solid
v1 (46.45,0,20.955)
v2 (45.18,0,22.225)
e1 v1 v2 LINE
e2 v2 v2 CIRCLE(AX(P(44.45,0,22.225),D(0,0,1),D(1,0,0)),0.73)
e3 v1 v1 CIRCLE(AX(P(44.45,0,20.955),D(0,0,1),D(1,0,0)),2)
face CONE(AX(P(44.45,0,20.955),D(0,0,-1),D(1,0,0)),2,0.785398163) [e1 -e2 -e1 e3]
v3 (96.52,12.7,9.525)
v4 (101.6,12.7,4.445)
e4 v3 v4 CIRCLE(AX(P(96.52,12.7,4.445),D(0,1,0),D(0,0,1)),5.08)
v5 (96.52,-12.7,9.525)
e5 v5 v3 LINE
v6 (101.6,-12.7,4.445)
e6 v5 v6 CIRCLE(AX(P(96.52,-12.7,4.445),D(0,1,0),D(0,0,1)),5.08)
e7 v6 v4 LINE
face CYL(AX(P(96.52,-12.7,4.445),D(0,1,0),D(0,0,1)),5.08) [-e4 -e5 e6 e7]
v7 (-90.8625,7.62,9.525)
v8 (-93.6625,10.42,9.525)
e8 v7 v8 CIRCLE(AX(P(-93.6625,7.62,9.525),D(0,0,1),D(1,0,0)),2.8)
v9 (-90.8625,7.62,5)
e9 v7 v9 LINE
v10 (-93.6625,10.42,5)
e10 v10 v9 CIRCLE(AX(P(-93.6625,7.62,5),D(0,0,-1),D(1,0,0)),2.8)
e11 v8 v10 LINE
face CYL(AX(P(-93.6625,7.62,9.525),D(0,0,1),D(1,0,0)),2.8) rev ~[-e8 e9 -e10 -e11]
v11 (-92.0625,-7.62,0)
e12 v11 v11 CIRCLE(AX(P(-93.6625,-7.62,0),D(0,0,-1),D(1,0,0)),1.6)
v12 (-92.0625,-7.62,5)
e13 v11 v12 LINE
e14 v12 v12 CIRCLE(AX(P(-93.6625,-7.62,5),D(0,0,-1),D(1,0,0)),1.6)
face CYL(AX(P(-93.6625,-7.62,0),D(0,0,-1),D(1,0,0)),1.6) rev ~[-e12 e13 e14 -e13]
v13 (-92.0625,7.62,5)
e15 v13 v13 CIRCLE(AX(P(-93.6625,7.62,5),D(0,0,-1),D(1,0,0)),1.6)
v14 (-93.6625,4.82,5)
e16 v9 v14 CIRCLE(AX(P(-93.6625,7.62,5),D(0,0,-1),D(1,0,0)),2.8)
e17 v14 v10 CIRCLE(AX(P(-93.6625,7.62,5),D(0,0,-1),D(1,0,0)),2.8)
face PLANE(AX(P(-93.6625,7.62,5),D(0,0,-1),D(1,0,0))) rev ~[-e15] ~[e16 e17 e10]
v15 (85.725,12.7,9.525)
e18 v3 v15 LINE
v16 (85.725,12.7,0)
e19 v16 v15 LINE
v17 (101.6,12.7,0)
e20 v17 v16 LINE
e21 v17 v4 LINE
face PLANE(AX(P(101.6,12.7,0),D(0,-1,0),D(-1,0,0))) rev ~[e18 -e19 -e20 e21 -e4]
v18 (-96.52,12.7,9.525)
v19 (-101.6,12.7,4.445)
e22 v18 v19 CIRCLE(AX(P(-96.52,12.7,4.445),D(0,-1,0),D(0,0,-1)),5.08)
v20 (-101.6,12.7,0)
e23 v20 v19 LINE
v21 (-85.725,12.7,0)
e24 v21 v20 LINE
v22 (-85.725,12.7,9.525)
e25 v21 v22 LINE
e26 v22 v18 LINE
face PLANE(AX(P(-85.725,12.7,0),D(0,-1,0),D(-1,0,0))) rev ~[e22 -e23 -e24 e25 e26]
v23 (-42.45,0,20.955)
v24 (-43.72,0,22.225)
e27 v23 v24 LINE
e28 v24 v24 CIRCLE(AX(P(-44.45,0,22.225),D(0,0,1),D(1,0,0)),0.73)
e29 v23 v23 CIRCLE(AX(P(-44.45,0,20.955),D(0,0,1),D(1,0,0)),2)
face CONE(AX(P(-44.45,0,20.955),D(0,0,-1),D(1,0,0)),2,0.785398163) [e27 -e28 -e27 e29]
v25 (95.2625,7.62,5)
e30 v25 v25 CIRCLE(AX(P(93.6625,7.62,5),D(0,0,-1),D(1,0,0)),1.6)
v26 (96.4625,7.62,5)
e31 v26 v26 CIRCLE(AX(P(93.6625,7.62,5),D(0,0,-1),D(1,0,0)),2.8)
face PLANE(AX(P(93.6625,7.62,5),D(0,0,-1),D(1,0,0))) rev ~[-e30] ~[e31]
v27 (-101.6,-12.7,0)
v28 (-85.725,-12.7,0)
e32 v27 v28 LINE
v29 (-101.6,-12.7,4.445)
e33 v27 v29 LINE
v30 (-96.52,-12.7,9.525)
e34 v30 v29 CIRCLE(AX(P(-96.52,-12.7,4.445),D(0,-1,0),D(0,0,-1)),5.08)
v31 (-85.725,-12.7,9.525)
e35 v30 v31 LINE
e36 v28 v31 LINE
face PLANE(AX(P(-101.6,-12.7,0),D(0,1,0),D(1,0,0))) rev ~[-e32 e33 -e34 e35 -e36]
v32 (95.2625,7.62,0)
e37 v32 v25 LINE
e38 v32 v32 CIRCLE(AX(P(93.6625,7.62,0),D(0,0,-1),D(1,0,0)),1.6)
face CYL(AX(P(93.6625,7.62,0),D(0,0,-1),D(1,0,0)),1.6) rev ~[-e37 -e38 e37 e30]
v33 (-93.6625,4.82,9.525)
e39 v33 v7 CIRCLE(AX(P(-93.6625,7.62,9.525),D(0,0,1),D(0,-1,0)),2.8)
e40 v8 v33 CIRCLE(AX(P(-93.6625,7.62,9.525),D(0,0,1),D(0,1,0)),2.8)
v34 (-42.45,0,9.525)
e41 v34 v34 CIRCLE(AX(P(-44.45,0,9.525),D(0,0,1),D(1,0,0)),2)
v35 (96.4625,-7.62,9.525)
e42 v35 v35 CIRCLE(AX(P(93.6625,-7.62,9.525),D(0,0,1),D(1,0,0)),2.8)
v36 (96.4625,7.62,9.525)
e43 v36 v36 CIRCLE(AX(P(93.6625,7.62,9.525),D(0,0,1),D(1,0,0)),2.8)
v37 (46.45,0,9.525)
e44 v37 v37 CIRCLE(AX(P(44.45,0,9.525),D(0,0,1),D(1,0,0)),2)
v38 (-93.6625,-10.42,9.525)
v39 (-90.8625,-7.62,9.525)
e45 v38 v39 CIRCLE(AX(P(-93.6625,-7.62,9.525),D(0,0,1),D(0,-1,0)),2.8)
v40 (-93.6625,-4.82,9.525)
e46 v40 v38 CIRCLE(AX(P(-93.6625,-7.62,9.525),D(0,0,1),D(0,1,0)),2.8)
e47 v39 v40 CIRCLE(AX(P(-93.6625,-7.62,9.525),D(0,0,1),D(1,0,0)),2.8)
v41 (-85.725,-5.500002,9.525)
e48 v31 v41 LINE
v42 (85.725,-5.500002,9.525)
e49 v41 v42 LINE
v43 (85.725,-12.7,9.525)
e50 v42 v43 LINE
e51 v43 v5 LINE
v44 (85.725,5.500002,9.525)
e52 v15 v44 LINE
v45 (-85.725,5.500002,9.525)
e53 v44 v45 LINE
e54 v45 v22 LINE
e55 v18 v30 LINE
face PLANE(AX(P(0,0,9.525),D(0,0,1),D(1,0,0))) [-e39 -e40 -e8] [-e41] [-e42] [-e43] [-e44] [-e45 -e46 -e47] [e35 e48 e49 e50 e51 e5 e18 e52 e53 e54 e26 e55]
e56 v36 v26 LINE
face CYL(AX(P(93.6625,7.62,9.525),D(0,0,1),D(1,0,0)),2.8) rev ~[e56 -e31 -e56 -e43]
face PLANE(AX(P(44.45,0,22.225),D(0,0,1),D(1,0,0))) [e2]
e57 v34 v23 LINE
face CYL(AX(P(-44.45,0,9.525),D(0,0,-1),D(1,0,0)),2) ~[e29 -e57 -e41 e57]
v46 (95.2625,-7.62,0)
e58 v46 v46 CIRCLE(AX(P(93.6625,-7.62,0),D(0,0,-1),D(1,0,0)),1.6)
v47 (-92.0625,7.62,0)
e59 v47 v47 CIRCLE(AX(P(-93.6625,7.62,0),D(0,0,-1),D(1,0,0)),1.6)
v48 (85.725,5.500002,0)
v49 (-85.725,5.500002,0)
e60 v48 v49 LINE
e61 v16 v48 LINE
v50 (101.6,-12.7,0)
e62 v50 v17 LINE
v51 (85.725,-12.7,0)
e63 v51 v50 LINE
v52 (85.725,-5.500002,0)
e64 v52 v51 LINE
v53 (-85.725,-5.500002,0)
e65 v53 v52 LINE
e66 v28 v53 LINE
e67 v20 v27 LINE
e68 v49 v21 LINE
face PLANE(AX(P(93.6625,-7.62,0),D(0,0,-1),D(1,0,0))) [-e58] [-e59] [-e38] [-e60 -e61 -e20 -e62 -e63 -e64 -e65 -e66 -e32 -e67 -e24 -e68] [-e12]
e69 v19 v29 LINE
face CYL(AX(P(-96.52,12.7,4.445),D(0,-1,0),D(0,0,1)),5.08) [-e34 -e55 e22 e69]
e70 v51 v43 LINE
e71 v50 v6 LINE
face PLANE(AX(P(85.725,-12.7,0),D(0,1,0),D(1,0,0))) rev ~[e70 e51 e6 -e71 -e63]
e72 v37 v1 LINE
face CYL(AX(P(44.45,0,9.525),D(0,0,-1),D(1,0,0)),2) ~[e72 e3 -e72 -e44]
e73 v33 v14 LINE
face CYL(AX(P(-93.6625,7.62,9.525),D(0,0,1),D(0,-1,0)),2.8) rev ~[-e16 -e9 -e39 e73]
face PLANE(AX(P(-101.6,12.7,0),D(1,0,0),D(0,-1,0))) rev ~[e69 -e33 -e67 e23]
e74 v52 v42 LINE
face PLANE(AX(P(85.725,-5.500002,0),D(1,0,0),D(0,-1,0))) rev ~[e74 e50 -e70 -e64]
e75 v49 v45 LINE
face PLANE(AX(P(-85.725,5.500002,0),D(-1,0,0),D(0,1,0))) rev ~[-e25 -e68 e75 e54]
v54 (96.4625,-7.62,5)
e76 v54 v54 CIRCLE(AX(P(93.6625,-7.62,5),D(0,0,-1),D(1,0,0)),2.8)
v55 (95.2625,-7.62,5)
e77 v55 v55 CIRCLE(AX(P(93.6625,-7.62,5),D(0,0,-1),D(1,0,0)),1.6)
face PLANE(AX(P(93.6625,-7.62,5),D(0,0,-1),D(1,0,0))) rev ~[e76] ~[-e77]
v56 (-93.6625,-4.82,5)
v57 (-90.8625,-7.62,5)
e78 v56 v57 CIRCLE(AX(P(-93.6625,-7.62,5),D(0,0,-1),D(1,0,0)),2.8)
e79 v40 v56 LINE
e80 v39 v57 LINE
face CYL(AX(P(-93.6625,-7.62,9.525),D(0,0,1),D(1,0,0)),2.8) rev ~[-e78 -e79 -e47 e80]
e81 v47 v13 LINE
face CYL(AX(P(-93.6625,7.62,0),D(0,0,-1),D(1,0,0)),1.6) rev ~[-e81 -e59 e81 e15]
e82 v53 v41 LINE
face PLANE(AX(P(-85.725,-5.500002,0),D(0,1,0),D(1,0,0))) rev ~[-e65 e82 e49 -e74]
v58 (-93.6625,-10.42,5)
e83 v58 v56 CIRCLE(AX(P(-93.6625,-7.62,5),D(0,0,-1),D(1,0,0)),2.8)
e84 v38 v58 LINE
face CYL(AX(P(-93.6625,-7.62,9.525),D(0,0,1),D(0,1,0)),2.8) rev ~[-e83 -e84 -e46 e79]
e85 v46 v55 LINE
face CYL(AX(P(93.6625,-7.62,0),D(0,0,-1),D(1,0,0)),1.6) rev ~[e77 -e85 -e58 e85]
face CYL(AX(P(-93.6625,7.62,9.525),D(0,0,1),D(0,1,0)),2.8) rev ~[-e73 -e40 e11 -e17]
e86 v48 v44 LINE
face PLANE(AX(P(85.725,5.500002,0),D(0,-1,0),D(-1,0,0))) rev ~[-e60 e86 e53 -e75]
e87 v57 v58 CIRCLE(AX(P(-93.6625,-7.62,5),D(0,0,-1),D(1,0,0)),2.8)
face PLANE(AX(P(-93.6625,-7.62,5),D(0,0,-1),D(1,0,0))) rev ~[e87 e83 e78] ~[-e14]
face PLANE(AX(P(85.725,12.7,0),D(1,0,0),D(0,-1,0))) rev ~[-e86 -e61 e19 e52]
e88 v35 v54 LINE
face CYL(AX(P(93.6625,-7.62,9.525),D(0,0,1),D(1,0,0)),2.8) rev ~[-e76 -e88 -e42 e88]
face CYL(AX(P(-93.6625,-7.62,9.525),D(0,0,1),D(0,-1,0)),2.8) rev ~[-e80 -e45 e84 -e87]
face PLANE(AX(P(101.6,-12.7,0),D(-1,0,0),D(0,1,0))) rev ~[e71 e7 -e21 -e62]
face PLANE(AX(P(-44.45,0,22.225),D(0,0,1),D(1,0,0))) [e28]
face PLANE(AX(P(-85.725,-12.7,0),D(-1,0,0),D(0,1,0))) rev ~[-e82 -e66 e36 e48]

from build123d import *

# Parameters (mm, degrees)
F1_DEPTH = 9.525
F2_R     = 2.8
F3_DEPTH = 9.525
F4_R     = 2
F5_DEPTH = 12.7
F6_SIZE  = 1.27
F7_R     = 5.08
F8_R     = 2.8
F8_R_2   = 1.6
F9_DEPTH = 5


# Not quite as in the source:
# - a length typed as a fraction of an inch, garbled in the dataset ("3 / 203.2 mm" for 3/8 in), is restored


with BuildPart() as f1:
    # F0 (on Top) → F1 (new body)
    with BuildSketch(Plane.XY):
        Polygon((-85.725, -5.5000017), (85.725, -5.5000017), (85.725, -12.7), (101.6, -12.7), (101.6, -5.5000017), (101.6, 5.5000017), (101.6, 12.7), (85.725, 12.7), (85.725, 5.5000017), (-85.725, 5.5000017), (-85.725, 12.7), (-101.6, 12.7), (-101.6, 5.5000017), (-101.6, -5.5000017), (-101.6, -12.7), (-85.725, -12.7), align=None)
    extrude(amount=F1_DEPTH)

    # F2 (on face) → F3 (cut, through all)
    with BuildSketch(Plane.XY.offset(9.525)):
        with BuildLine():
            ThreePointArc((-93.6625, 4.82), (-91.6826010127, 5.6401010127), (-90.8625, 7.62))
            ThreePointArc((-90.8625, 7.62), (-91.6826010127, 9.5998989873), (-93.6625, 10.42))
            Line((-93.6625, 10.42), (-93.6625, 4.82))
        make_face()
        with BuildLine():
            ThreePointArc((-90.8625, -7.62), (-91.6826010127, -5.6401010127), (-93.6625, -4.82))
            Line((-93.6625, -4.82), (-93.6625, -10.42))
            ThreePointArc((-93.6625, -10.42), (-91.6826010127, -9.5998989873), (-90.8625, -7.62))
        make_face()
        with BuildLine():
            Line((-93.6625, -10.42), (-93.6625, -4.82))
            ThreePointArc((-93.6625, -4.82), (-96.4625, -7.62), (-93.6625, -10.42))
        make_face()
        with BuildLine():
            Line((-93.6625, 4.82), (-93.6625, 10.42))
            ThreePointArc((-93.6625, 10.42), (-96.4625, 7.62), (-93.6625, 4.82))
        make_face()
        with Locations((93.6625, 7.62)):
            Circle(F2_R)
        with Locations((93.6625, -7.62)):
            Circle(F2_R)
    extrude(amount=-F3_DEPTH, mode=Mode.SUBTRACT)

    # F4 (on face) → F5 (join)
    with BuildSketch(Plane.XY.offset(9.525)):
        with Locations((-44.45, 0)):
            Circle(F4_R)
        with Locations((44.45, 0)):
            Circle(F4_R)
    extrude(amount=F5_DEPTH)

    # F6
    f6_edges = [f1.edges().sort_by_distance(p)[0] for p in [
        (-46.45, 0, 22.225),
        (42.45, 0, 22.225),
    ]]
    chamfer(f6_edges, length=F6_SIZE)

    # F7
    f7_edges = [f1.edges().sort_by_distance(p)[0] for p in [
        (-101.6, 0, 9.525),
        (101.6, 0, 9.525),
    ]]
    fillet(f7_edges, radius=F7_R)

    # F8 (on face) → F9 (join)
    with BuildSketch(Plane(origin=(0, 0, 0), x_dir=(1, 0, 0), z_dir=(0, 0, -1))):
        with Locations((93.6625, 7.62)):
            Circle(F8_R)
        with Locations((93.6625, 7.62)):
            Circle(F8_R_2, mode=Mode.SUBTRACT)
        with Locations((93.6625, -7.62)):
            Circle(F8_R)
        with Locations((93.6625, -7.62)):
            Circle(F8_R_2, mode=Mode.SUBTRACT)
        with Locations((-93.6625, 7.62)):
            Circle(F8_R)
        with Locations((-93.6625, 7.62)):
            Circle(F8_R_2, mode=Mode.SUBTRACT)
        with Locations((-93.6625, -7.62)):
            Circle(F8_R)
        with Locations((-93.6625, -7.62)):
            Circle(F8_R_2, mode=Mode.SUBTRACT)
    extrude(amount=-F9_DEPTH)


solid = f1.part
